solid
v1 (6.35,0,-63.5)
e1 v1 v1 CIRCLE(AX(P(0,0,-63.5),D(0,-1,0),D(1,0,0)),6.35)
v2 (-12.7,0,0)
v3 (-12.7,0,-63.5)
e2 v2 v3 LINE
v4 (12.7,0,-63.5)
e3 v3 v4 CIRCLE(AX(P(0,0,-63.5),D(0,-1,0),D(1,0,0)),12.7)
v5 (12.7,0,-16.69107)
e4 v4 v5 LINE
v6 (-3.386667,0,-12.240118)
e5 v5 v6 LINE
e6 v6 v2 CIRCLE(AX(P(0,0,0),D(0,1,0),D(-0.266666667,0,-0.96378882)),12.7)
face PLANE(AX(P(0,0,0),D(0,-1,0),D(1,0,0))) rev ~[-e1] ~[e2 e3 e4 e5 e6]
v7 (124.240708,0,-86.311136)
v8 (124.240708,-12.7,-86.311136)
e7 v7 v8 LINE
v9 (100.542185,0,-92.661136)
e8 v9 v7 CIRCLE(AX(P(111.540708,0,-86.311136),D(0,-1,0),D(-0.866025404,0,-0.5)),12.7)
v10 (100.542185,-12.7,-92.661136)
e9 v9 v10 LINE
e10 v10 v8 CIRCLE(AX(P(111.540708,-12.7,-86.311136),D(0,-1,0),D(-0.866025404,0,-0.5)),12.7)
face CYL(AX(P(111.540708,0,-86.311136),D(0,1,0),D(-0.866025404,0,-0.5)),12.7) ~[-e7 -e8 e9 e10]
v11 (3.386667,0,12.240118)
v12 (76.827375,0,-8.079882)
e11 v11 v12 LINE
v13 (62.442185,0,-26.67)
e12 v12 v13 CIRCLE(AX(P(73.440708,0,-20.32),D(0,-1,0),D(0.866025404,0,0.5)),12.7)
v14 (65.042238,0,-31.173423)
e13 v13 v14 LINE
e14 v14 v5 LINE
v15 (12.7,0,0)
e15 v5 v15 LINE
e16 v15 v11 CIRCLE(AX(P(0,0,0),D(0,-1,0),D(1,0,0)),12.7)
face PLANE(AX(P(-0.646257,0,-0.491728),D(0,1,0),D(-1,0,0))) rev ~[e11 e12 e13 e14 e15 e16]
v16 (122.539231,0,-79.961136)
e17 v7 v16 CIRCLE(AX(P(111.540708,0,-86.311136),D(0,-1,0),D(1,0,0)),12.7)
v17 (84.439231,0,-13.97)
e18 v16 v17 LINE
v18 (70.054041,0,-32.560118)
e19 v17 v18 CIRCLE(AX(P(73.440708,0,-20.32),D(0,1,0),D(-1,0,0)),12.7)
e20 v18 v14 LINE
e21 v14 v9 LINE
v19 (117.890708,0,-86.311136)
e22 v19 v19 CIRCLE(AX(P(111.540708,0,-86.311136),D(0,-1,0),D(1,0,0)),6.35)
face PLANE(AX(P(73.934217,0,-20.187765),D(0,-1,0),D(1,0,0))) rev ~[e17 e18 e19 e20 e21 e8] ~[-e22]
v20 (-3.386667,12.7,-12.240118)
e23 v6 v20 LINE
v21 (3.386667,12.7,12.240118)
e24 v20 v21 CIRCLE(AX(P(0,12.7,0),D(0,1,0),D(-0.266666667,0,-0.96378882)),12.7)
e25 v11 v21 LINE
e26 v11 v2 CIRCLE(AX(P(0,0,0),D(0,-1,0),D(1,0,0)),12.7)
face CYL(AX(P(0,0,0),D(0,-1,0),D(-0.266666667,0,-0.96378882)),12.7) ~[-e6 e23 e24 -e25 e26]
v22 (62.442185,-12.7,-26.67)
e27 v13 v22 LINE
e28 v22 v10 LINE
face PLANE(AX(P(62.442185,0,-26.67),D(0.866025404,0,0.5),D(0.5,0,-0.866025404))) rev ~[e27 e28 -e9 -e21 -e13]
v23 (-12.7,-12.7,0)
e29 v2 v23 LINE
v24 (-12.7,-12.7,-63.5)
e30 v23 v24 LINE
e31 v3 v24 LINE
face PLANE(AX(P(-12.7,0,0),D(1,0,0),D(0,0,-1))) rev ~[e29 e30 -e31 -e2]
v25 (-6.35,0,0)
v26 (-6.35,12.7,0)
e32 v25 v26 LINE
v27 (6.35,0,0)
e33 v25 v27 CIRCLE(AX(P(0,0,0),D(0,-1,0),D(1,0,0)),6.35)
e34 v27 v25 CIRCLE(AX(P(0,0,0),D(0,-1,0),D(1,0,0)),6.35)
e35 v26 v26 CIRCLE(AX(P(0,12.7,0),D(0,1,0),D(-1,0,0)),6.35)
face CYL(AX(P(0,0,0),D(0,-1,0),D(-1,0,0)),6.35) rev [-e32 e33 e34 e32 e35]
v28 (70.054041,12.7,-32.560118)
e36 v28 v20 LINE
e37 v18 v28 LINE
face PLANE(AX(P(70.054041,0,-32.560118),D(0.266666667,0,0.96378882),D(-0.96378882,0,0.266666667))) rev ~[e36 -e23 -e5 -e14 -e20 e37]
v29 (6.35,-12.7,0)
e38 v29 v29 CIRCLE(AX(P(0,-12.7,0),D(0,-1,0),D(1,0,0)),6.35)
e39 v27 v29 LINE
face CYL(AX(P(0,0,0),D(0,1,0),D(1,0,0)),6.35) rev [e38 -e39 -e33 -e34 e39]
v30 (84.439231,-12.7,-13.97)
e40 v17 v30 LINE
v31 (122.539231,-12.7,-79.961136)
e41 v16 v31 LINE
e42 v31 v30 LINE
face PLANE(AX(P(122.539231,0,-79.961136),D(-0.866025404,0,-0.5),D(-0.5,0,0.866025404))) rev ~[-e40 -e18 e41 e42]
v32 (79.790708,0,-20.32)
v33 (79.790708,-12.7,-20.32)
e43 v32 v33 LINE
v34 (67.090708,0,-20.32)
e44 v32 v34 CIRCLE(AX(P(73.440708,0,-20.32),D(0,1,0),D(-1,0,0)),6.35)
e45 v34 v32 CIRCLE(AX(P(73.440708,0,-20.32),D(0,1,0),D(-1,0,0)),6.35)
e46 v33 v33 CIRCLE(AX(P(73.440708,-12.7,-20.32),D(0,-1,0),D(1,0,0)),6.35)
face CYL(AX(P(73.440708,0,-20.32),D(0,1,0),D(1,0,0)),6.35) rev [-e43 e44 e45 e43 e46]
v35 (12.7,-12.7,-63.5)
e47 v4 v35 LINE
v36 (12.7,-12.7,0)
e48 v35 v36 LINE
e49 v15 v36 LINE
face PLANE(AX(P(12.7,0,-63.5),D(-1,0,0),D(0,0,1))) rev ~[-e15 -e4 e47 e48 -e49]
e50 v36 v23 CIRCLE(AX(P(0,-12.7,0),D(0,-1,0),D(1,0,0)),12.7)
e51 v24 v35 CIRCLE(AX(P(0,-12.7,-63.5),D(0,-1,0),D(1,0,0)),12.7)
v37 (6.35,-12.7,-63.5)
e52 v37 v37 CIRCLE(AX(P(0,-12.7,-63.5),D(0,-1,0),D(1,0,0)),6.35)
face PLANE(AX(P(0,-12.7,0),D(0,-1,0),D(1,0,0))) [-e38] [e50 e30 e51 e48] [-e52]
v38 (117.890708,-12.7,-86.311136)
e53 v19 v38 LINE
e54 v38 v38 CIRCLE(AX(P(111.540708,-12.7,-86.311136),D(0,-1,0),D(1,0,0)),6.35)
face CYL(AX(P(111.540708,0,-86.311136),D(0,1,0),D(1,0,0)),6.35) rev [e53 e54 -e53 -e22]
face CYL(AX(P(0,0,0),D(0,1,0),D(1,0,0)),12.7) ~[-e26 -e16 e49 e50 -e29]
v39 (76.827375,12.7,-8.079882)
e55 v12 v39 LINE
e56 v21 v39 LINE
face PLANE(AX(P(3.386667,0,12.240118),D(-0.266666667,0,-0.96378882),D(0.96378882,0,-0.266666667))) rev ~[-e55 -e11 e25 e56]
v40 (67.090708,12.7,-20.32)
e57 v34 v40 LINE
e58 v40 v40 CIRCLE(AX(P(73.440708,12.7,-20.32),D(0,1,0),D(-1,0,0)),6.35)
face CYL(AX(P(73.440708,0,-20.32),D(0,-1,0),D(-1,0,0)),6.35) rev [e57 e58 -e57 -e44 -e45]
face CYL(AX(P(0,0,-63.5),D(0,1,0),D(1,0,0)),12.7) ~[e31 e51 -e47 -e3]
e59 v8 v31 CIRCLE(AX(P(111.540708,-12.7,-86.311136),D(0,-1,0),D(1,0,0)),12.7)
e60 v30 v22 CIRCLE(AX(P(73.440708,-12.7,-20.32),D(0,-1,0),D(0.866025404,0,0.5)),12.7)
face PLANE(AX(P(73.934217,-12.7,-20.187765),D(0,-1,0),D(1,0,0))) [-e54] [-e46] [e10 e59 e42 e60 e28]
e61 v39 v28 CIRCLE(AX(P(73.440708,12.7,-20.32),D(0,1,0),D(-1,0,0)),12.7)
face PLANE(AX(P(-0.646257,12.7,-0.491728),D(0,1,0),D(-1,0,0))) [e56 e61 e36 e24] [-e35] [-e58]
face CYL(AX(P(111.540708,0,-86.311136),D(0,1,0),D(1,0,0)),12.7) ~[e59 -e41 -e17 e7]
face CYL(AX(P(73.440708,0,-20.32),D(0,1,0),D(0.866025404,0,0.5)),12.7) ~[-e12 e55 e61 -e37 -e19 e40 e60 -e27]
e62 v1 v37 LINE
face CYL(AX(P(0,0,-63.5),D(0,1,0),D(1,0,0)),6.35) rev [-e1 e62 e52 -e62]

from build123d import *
from build123d import SkipClean  # not in build123d's __all__

# Parameters (mm, degrees)
F0_R     = 6.35
F1_DEPTH = 12.7
F2_R     = 6.35
F3_DEPTH = 12.7
F4_R     = 6.35
F5_DEPTH = 12.7


# Not quite as in the source:
# - after a boolean that leaves OpenCascade's solid faulty, fix() repairs it


with BuildPart() as f1:
    # F0 (on Front) → F1 (new body)
    with BuildSketch(Plane.XZ):
        with BuildLine():
            ThreePointArc((-12.7, 0), (0, -12.7), (12.7, 0))
            ThreePointArc((12.7, 0), (0, 12.7), (-12.7, 0))
        make_face()
        Circle(F0_R, mode=Mode.SUBTRACT)
        with BuildLine():
            Line((12.7, -63.5), (12.7, 0))
            ThreePointArc((12.7, 0), (0, -12.7), (-12.7, 0))
            Line((-12.7, 0), (-12.7, -63.5))
            ThreePointArc((-12.7, -63.5), (0, -50.8), (12.7, -63.5))
        make_face()
        with BuildLine():
            ThreePointArc((-12.7, -63.5), (0, -76.2), (12.7, -63.5))
            ThreePointArc((12.7, -63.5), (0, -50.8), (-12.7, -63.5))
        make_face()
        with Locations((0, -63.5)):
            Circle(F0_R, mode=Mode.SUBTRACT)
    extrude(amount=F1_DEPTH)

    # F2 (on face) → F3 (join)
    with BuildSketch(Plane(origin=(0, 0, 0), x_dir=(-1, 0, 0), z_dir=(0, 1, 0))):
        with BuildLine():
            ThreePointArc((3.3866666667, -12.2401180096), (10.1069448071, -7.6902318994), (12.7, 0))
            ThreePointArc((12.7, 0), (7.6902318994, 10.1069448071), (-3.3866666667, 12.2401180096))
            ThreePointArc((-3.3866666667, 12.2401180096), (-12.2401180096, -3.3866666667), (3.3866666667, -12.2401180096))
        make_face()
        Circle(F2_R, mode=Mode.SUBTRACT)
        with BuildLine():
            ThreePointArc((3.3866666667, -12.2401180096), (-12.2401180096, -3.3866666667), (-3.3866666667, 12.2401180096))
            Line((-3.3866666667, 12.2401180096), (-76.8273747243, -8.0798819904))
            ThreePointArc((-76.8273747243, -8.0798819904), (-65.7504761582, -10.2130551929), (-60.7407080576, -20.32))
            ThreePointArc((-60.7407080576, -20.32), (-63.3337632505, -28.0102318994), (-70.0540413909, -32.5601180096))
            Line((-70.0540413909, -32.5601180096), (3.3866666667, -12.2401180096))
        make_face()
        with BuildLine():
            ThreePointArc((-60.7407080576, -20.32), (-65.7504761582, -10.2130551929), (-76.8273747243, -8.0798819904))
            ThreePointArc((-76.8273747243, -8.0798819904), (-85.6808260672, -23.7066666667), (-70.0540413909, -32.5601180096))
            ThreePointArc((-70.0540413909, -32.5601180096), (-63.3337632505, -28.0102318994), (-60.7407080576, -20.32))
        make_face()
        with Locations((-73.4407080576, -20.32)):
            Circle(F2_R, mode=Mode.SUBTRACT)
    with SkipClean():  # cleaning this boolean's faces spoils the solid; the shape is the same uncleaned
        extrude(amount=F3_DEPTH)

    # F4 (on face) → F5 (join)
    with BuildSketch(Plane.XZ):
        with BuildLine():
            ThreePointArc((62.4421854295, -26.67), (76.7277099304, -32.5872579939), (86.1407080576, -20.32))
            ThreePointArc((86.1407080576, -20.32), (85.7079660515, -17.0329981272), (84.4392306857, -13.97))
            ThreePointArc((84.4392306857, -13.97), (67.0907080576, -9.3214773719), (62.4421854295, -26.67))
        make_face()
        with Locations((73.4407080576, -20.32)):
            Circle(F4_R, mode=Mode.SUBTRACT)
        with BuildLine():
            ThreePointArc((84.4392306857, -13.97), (85.7079660515, -17.0329981272), (86.1407080576, -20.32))
            ThreePointArc((86.1407080576, -20.32), (76.7277099304, -32.5872579939), (62.4421854295, -26.67))
            Line((62.4421854295, -26.67), (100.5421854295, -92.6611357684))
            ThreePointArc((100.5421854295, -92.6611357684), (105.1907080576, -75.3126131403), (122.5392306857, -79.9611357684))
            Line((122.5392306857, -79.9611357684), (84.4392306857, -13.97))
        make_face()
        with BuildLine():
            ThreePointArc((124.2407080576, -86.3111357684), (123.8079660515, -83.0241338956), (122.5392306857, -79.9611357684))
            ThreePointArc((122.5392306857, -79.9611357684), (105.1907080576, -75.3126131403), (100.5421854295, -92.6611357684))
            ThreePointArc((100.5421854295, -92.6611357684), (114.8277099304, -98.5783937622), (124.2407080576, -86.3111357684))
        make_face()
        with Locations((111.5407080576, -86.3111357684)):
            Circle(F4_R, mode=Mode.SUBTRACT)
    extrude(amount=F5_DEPTH)

    add(f1.part.fix(), mode=Mode.REPLACE)


solid = f1.part
